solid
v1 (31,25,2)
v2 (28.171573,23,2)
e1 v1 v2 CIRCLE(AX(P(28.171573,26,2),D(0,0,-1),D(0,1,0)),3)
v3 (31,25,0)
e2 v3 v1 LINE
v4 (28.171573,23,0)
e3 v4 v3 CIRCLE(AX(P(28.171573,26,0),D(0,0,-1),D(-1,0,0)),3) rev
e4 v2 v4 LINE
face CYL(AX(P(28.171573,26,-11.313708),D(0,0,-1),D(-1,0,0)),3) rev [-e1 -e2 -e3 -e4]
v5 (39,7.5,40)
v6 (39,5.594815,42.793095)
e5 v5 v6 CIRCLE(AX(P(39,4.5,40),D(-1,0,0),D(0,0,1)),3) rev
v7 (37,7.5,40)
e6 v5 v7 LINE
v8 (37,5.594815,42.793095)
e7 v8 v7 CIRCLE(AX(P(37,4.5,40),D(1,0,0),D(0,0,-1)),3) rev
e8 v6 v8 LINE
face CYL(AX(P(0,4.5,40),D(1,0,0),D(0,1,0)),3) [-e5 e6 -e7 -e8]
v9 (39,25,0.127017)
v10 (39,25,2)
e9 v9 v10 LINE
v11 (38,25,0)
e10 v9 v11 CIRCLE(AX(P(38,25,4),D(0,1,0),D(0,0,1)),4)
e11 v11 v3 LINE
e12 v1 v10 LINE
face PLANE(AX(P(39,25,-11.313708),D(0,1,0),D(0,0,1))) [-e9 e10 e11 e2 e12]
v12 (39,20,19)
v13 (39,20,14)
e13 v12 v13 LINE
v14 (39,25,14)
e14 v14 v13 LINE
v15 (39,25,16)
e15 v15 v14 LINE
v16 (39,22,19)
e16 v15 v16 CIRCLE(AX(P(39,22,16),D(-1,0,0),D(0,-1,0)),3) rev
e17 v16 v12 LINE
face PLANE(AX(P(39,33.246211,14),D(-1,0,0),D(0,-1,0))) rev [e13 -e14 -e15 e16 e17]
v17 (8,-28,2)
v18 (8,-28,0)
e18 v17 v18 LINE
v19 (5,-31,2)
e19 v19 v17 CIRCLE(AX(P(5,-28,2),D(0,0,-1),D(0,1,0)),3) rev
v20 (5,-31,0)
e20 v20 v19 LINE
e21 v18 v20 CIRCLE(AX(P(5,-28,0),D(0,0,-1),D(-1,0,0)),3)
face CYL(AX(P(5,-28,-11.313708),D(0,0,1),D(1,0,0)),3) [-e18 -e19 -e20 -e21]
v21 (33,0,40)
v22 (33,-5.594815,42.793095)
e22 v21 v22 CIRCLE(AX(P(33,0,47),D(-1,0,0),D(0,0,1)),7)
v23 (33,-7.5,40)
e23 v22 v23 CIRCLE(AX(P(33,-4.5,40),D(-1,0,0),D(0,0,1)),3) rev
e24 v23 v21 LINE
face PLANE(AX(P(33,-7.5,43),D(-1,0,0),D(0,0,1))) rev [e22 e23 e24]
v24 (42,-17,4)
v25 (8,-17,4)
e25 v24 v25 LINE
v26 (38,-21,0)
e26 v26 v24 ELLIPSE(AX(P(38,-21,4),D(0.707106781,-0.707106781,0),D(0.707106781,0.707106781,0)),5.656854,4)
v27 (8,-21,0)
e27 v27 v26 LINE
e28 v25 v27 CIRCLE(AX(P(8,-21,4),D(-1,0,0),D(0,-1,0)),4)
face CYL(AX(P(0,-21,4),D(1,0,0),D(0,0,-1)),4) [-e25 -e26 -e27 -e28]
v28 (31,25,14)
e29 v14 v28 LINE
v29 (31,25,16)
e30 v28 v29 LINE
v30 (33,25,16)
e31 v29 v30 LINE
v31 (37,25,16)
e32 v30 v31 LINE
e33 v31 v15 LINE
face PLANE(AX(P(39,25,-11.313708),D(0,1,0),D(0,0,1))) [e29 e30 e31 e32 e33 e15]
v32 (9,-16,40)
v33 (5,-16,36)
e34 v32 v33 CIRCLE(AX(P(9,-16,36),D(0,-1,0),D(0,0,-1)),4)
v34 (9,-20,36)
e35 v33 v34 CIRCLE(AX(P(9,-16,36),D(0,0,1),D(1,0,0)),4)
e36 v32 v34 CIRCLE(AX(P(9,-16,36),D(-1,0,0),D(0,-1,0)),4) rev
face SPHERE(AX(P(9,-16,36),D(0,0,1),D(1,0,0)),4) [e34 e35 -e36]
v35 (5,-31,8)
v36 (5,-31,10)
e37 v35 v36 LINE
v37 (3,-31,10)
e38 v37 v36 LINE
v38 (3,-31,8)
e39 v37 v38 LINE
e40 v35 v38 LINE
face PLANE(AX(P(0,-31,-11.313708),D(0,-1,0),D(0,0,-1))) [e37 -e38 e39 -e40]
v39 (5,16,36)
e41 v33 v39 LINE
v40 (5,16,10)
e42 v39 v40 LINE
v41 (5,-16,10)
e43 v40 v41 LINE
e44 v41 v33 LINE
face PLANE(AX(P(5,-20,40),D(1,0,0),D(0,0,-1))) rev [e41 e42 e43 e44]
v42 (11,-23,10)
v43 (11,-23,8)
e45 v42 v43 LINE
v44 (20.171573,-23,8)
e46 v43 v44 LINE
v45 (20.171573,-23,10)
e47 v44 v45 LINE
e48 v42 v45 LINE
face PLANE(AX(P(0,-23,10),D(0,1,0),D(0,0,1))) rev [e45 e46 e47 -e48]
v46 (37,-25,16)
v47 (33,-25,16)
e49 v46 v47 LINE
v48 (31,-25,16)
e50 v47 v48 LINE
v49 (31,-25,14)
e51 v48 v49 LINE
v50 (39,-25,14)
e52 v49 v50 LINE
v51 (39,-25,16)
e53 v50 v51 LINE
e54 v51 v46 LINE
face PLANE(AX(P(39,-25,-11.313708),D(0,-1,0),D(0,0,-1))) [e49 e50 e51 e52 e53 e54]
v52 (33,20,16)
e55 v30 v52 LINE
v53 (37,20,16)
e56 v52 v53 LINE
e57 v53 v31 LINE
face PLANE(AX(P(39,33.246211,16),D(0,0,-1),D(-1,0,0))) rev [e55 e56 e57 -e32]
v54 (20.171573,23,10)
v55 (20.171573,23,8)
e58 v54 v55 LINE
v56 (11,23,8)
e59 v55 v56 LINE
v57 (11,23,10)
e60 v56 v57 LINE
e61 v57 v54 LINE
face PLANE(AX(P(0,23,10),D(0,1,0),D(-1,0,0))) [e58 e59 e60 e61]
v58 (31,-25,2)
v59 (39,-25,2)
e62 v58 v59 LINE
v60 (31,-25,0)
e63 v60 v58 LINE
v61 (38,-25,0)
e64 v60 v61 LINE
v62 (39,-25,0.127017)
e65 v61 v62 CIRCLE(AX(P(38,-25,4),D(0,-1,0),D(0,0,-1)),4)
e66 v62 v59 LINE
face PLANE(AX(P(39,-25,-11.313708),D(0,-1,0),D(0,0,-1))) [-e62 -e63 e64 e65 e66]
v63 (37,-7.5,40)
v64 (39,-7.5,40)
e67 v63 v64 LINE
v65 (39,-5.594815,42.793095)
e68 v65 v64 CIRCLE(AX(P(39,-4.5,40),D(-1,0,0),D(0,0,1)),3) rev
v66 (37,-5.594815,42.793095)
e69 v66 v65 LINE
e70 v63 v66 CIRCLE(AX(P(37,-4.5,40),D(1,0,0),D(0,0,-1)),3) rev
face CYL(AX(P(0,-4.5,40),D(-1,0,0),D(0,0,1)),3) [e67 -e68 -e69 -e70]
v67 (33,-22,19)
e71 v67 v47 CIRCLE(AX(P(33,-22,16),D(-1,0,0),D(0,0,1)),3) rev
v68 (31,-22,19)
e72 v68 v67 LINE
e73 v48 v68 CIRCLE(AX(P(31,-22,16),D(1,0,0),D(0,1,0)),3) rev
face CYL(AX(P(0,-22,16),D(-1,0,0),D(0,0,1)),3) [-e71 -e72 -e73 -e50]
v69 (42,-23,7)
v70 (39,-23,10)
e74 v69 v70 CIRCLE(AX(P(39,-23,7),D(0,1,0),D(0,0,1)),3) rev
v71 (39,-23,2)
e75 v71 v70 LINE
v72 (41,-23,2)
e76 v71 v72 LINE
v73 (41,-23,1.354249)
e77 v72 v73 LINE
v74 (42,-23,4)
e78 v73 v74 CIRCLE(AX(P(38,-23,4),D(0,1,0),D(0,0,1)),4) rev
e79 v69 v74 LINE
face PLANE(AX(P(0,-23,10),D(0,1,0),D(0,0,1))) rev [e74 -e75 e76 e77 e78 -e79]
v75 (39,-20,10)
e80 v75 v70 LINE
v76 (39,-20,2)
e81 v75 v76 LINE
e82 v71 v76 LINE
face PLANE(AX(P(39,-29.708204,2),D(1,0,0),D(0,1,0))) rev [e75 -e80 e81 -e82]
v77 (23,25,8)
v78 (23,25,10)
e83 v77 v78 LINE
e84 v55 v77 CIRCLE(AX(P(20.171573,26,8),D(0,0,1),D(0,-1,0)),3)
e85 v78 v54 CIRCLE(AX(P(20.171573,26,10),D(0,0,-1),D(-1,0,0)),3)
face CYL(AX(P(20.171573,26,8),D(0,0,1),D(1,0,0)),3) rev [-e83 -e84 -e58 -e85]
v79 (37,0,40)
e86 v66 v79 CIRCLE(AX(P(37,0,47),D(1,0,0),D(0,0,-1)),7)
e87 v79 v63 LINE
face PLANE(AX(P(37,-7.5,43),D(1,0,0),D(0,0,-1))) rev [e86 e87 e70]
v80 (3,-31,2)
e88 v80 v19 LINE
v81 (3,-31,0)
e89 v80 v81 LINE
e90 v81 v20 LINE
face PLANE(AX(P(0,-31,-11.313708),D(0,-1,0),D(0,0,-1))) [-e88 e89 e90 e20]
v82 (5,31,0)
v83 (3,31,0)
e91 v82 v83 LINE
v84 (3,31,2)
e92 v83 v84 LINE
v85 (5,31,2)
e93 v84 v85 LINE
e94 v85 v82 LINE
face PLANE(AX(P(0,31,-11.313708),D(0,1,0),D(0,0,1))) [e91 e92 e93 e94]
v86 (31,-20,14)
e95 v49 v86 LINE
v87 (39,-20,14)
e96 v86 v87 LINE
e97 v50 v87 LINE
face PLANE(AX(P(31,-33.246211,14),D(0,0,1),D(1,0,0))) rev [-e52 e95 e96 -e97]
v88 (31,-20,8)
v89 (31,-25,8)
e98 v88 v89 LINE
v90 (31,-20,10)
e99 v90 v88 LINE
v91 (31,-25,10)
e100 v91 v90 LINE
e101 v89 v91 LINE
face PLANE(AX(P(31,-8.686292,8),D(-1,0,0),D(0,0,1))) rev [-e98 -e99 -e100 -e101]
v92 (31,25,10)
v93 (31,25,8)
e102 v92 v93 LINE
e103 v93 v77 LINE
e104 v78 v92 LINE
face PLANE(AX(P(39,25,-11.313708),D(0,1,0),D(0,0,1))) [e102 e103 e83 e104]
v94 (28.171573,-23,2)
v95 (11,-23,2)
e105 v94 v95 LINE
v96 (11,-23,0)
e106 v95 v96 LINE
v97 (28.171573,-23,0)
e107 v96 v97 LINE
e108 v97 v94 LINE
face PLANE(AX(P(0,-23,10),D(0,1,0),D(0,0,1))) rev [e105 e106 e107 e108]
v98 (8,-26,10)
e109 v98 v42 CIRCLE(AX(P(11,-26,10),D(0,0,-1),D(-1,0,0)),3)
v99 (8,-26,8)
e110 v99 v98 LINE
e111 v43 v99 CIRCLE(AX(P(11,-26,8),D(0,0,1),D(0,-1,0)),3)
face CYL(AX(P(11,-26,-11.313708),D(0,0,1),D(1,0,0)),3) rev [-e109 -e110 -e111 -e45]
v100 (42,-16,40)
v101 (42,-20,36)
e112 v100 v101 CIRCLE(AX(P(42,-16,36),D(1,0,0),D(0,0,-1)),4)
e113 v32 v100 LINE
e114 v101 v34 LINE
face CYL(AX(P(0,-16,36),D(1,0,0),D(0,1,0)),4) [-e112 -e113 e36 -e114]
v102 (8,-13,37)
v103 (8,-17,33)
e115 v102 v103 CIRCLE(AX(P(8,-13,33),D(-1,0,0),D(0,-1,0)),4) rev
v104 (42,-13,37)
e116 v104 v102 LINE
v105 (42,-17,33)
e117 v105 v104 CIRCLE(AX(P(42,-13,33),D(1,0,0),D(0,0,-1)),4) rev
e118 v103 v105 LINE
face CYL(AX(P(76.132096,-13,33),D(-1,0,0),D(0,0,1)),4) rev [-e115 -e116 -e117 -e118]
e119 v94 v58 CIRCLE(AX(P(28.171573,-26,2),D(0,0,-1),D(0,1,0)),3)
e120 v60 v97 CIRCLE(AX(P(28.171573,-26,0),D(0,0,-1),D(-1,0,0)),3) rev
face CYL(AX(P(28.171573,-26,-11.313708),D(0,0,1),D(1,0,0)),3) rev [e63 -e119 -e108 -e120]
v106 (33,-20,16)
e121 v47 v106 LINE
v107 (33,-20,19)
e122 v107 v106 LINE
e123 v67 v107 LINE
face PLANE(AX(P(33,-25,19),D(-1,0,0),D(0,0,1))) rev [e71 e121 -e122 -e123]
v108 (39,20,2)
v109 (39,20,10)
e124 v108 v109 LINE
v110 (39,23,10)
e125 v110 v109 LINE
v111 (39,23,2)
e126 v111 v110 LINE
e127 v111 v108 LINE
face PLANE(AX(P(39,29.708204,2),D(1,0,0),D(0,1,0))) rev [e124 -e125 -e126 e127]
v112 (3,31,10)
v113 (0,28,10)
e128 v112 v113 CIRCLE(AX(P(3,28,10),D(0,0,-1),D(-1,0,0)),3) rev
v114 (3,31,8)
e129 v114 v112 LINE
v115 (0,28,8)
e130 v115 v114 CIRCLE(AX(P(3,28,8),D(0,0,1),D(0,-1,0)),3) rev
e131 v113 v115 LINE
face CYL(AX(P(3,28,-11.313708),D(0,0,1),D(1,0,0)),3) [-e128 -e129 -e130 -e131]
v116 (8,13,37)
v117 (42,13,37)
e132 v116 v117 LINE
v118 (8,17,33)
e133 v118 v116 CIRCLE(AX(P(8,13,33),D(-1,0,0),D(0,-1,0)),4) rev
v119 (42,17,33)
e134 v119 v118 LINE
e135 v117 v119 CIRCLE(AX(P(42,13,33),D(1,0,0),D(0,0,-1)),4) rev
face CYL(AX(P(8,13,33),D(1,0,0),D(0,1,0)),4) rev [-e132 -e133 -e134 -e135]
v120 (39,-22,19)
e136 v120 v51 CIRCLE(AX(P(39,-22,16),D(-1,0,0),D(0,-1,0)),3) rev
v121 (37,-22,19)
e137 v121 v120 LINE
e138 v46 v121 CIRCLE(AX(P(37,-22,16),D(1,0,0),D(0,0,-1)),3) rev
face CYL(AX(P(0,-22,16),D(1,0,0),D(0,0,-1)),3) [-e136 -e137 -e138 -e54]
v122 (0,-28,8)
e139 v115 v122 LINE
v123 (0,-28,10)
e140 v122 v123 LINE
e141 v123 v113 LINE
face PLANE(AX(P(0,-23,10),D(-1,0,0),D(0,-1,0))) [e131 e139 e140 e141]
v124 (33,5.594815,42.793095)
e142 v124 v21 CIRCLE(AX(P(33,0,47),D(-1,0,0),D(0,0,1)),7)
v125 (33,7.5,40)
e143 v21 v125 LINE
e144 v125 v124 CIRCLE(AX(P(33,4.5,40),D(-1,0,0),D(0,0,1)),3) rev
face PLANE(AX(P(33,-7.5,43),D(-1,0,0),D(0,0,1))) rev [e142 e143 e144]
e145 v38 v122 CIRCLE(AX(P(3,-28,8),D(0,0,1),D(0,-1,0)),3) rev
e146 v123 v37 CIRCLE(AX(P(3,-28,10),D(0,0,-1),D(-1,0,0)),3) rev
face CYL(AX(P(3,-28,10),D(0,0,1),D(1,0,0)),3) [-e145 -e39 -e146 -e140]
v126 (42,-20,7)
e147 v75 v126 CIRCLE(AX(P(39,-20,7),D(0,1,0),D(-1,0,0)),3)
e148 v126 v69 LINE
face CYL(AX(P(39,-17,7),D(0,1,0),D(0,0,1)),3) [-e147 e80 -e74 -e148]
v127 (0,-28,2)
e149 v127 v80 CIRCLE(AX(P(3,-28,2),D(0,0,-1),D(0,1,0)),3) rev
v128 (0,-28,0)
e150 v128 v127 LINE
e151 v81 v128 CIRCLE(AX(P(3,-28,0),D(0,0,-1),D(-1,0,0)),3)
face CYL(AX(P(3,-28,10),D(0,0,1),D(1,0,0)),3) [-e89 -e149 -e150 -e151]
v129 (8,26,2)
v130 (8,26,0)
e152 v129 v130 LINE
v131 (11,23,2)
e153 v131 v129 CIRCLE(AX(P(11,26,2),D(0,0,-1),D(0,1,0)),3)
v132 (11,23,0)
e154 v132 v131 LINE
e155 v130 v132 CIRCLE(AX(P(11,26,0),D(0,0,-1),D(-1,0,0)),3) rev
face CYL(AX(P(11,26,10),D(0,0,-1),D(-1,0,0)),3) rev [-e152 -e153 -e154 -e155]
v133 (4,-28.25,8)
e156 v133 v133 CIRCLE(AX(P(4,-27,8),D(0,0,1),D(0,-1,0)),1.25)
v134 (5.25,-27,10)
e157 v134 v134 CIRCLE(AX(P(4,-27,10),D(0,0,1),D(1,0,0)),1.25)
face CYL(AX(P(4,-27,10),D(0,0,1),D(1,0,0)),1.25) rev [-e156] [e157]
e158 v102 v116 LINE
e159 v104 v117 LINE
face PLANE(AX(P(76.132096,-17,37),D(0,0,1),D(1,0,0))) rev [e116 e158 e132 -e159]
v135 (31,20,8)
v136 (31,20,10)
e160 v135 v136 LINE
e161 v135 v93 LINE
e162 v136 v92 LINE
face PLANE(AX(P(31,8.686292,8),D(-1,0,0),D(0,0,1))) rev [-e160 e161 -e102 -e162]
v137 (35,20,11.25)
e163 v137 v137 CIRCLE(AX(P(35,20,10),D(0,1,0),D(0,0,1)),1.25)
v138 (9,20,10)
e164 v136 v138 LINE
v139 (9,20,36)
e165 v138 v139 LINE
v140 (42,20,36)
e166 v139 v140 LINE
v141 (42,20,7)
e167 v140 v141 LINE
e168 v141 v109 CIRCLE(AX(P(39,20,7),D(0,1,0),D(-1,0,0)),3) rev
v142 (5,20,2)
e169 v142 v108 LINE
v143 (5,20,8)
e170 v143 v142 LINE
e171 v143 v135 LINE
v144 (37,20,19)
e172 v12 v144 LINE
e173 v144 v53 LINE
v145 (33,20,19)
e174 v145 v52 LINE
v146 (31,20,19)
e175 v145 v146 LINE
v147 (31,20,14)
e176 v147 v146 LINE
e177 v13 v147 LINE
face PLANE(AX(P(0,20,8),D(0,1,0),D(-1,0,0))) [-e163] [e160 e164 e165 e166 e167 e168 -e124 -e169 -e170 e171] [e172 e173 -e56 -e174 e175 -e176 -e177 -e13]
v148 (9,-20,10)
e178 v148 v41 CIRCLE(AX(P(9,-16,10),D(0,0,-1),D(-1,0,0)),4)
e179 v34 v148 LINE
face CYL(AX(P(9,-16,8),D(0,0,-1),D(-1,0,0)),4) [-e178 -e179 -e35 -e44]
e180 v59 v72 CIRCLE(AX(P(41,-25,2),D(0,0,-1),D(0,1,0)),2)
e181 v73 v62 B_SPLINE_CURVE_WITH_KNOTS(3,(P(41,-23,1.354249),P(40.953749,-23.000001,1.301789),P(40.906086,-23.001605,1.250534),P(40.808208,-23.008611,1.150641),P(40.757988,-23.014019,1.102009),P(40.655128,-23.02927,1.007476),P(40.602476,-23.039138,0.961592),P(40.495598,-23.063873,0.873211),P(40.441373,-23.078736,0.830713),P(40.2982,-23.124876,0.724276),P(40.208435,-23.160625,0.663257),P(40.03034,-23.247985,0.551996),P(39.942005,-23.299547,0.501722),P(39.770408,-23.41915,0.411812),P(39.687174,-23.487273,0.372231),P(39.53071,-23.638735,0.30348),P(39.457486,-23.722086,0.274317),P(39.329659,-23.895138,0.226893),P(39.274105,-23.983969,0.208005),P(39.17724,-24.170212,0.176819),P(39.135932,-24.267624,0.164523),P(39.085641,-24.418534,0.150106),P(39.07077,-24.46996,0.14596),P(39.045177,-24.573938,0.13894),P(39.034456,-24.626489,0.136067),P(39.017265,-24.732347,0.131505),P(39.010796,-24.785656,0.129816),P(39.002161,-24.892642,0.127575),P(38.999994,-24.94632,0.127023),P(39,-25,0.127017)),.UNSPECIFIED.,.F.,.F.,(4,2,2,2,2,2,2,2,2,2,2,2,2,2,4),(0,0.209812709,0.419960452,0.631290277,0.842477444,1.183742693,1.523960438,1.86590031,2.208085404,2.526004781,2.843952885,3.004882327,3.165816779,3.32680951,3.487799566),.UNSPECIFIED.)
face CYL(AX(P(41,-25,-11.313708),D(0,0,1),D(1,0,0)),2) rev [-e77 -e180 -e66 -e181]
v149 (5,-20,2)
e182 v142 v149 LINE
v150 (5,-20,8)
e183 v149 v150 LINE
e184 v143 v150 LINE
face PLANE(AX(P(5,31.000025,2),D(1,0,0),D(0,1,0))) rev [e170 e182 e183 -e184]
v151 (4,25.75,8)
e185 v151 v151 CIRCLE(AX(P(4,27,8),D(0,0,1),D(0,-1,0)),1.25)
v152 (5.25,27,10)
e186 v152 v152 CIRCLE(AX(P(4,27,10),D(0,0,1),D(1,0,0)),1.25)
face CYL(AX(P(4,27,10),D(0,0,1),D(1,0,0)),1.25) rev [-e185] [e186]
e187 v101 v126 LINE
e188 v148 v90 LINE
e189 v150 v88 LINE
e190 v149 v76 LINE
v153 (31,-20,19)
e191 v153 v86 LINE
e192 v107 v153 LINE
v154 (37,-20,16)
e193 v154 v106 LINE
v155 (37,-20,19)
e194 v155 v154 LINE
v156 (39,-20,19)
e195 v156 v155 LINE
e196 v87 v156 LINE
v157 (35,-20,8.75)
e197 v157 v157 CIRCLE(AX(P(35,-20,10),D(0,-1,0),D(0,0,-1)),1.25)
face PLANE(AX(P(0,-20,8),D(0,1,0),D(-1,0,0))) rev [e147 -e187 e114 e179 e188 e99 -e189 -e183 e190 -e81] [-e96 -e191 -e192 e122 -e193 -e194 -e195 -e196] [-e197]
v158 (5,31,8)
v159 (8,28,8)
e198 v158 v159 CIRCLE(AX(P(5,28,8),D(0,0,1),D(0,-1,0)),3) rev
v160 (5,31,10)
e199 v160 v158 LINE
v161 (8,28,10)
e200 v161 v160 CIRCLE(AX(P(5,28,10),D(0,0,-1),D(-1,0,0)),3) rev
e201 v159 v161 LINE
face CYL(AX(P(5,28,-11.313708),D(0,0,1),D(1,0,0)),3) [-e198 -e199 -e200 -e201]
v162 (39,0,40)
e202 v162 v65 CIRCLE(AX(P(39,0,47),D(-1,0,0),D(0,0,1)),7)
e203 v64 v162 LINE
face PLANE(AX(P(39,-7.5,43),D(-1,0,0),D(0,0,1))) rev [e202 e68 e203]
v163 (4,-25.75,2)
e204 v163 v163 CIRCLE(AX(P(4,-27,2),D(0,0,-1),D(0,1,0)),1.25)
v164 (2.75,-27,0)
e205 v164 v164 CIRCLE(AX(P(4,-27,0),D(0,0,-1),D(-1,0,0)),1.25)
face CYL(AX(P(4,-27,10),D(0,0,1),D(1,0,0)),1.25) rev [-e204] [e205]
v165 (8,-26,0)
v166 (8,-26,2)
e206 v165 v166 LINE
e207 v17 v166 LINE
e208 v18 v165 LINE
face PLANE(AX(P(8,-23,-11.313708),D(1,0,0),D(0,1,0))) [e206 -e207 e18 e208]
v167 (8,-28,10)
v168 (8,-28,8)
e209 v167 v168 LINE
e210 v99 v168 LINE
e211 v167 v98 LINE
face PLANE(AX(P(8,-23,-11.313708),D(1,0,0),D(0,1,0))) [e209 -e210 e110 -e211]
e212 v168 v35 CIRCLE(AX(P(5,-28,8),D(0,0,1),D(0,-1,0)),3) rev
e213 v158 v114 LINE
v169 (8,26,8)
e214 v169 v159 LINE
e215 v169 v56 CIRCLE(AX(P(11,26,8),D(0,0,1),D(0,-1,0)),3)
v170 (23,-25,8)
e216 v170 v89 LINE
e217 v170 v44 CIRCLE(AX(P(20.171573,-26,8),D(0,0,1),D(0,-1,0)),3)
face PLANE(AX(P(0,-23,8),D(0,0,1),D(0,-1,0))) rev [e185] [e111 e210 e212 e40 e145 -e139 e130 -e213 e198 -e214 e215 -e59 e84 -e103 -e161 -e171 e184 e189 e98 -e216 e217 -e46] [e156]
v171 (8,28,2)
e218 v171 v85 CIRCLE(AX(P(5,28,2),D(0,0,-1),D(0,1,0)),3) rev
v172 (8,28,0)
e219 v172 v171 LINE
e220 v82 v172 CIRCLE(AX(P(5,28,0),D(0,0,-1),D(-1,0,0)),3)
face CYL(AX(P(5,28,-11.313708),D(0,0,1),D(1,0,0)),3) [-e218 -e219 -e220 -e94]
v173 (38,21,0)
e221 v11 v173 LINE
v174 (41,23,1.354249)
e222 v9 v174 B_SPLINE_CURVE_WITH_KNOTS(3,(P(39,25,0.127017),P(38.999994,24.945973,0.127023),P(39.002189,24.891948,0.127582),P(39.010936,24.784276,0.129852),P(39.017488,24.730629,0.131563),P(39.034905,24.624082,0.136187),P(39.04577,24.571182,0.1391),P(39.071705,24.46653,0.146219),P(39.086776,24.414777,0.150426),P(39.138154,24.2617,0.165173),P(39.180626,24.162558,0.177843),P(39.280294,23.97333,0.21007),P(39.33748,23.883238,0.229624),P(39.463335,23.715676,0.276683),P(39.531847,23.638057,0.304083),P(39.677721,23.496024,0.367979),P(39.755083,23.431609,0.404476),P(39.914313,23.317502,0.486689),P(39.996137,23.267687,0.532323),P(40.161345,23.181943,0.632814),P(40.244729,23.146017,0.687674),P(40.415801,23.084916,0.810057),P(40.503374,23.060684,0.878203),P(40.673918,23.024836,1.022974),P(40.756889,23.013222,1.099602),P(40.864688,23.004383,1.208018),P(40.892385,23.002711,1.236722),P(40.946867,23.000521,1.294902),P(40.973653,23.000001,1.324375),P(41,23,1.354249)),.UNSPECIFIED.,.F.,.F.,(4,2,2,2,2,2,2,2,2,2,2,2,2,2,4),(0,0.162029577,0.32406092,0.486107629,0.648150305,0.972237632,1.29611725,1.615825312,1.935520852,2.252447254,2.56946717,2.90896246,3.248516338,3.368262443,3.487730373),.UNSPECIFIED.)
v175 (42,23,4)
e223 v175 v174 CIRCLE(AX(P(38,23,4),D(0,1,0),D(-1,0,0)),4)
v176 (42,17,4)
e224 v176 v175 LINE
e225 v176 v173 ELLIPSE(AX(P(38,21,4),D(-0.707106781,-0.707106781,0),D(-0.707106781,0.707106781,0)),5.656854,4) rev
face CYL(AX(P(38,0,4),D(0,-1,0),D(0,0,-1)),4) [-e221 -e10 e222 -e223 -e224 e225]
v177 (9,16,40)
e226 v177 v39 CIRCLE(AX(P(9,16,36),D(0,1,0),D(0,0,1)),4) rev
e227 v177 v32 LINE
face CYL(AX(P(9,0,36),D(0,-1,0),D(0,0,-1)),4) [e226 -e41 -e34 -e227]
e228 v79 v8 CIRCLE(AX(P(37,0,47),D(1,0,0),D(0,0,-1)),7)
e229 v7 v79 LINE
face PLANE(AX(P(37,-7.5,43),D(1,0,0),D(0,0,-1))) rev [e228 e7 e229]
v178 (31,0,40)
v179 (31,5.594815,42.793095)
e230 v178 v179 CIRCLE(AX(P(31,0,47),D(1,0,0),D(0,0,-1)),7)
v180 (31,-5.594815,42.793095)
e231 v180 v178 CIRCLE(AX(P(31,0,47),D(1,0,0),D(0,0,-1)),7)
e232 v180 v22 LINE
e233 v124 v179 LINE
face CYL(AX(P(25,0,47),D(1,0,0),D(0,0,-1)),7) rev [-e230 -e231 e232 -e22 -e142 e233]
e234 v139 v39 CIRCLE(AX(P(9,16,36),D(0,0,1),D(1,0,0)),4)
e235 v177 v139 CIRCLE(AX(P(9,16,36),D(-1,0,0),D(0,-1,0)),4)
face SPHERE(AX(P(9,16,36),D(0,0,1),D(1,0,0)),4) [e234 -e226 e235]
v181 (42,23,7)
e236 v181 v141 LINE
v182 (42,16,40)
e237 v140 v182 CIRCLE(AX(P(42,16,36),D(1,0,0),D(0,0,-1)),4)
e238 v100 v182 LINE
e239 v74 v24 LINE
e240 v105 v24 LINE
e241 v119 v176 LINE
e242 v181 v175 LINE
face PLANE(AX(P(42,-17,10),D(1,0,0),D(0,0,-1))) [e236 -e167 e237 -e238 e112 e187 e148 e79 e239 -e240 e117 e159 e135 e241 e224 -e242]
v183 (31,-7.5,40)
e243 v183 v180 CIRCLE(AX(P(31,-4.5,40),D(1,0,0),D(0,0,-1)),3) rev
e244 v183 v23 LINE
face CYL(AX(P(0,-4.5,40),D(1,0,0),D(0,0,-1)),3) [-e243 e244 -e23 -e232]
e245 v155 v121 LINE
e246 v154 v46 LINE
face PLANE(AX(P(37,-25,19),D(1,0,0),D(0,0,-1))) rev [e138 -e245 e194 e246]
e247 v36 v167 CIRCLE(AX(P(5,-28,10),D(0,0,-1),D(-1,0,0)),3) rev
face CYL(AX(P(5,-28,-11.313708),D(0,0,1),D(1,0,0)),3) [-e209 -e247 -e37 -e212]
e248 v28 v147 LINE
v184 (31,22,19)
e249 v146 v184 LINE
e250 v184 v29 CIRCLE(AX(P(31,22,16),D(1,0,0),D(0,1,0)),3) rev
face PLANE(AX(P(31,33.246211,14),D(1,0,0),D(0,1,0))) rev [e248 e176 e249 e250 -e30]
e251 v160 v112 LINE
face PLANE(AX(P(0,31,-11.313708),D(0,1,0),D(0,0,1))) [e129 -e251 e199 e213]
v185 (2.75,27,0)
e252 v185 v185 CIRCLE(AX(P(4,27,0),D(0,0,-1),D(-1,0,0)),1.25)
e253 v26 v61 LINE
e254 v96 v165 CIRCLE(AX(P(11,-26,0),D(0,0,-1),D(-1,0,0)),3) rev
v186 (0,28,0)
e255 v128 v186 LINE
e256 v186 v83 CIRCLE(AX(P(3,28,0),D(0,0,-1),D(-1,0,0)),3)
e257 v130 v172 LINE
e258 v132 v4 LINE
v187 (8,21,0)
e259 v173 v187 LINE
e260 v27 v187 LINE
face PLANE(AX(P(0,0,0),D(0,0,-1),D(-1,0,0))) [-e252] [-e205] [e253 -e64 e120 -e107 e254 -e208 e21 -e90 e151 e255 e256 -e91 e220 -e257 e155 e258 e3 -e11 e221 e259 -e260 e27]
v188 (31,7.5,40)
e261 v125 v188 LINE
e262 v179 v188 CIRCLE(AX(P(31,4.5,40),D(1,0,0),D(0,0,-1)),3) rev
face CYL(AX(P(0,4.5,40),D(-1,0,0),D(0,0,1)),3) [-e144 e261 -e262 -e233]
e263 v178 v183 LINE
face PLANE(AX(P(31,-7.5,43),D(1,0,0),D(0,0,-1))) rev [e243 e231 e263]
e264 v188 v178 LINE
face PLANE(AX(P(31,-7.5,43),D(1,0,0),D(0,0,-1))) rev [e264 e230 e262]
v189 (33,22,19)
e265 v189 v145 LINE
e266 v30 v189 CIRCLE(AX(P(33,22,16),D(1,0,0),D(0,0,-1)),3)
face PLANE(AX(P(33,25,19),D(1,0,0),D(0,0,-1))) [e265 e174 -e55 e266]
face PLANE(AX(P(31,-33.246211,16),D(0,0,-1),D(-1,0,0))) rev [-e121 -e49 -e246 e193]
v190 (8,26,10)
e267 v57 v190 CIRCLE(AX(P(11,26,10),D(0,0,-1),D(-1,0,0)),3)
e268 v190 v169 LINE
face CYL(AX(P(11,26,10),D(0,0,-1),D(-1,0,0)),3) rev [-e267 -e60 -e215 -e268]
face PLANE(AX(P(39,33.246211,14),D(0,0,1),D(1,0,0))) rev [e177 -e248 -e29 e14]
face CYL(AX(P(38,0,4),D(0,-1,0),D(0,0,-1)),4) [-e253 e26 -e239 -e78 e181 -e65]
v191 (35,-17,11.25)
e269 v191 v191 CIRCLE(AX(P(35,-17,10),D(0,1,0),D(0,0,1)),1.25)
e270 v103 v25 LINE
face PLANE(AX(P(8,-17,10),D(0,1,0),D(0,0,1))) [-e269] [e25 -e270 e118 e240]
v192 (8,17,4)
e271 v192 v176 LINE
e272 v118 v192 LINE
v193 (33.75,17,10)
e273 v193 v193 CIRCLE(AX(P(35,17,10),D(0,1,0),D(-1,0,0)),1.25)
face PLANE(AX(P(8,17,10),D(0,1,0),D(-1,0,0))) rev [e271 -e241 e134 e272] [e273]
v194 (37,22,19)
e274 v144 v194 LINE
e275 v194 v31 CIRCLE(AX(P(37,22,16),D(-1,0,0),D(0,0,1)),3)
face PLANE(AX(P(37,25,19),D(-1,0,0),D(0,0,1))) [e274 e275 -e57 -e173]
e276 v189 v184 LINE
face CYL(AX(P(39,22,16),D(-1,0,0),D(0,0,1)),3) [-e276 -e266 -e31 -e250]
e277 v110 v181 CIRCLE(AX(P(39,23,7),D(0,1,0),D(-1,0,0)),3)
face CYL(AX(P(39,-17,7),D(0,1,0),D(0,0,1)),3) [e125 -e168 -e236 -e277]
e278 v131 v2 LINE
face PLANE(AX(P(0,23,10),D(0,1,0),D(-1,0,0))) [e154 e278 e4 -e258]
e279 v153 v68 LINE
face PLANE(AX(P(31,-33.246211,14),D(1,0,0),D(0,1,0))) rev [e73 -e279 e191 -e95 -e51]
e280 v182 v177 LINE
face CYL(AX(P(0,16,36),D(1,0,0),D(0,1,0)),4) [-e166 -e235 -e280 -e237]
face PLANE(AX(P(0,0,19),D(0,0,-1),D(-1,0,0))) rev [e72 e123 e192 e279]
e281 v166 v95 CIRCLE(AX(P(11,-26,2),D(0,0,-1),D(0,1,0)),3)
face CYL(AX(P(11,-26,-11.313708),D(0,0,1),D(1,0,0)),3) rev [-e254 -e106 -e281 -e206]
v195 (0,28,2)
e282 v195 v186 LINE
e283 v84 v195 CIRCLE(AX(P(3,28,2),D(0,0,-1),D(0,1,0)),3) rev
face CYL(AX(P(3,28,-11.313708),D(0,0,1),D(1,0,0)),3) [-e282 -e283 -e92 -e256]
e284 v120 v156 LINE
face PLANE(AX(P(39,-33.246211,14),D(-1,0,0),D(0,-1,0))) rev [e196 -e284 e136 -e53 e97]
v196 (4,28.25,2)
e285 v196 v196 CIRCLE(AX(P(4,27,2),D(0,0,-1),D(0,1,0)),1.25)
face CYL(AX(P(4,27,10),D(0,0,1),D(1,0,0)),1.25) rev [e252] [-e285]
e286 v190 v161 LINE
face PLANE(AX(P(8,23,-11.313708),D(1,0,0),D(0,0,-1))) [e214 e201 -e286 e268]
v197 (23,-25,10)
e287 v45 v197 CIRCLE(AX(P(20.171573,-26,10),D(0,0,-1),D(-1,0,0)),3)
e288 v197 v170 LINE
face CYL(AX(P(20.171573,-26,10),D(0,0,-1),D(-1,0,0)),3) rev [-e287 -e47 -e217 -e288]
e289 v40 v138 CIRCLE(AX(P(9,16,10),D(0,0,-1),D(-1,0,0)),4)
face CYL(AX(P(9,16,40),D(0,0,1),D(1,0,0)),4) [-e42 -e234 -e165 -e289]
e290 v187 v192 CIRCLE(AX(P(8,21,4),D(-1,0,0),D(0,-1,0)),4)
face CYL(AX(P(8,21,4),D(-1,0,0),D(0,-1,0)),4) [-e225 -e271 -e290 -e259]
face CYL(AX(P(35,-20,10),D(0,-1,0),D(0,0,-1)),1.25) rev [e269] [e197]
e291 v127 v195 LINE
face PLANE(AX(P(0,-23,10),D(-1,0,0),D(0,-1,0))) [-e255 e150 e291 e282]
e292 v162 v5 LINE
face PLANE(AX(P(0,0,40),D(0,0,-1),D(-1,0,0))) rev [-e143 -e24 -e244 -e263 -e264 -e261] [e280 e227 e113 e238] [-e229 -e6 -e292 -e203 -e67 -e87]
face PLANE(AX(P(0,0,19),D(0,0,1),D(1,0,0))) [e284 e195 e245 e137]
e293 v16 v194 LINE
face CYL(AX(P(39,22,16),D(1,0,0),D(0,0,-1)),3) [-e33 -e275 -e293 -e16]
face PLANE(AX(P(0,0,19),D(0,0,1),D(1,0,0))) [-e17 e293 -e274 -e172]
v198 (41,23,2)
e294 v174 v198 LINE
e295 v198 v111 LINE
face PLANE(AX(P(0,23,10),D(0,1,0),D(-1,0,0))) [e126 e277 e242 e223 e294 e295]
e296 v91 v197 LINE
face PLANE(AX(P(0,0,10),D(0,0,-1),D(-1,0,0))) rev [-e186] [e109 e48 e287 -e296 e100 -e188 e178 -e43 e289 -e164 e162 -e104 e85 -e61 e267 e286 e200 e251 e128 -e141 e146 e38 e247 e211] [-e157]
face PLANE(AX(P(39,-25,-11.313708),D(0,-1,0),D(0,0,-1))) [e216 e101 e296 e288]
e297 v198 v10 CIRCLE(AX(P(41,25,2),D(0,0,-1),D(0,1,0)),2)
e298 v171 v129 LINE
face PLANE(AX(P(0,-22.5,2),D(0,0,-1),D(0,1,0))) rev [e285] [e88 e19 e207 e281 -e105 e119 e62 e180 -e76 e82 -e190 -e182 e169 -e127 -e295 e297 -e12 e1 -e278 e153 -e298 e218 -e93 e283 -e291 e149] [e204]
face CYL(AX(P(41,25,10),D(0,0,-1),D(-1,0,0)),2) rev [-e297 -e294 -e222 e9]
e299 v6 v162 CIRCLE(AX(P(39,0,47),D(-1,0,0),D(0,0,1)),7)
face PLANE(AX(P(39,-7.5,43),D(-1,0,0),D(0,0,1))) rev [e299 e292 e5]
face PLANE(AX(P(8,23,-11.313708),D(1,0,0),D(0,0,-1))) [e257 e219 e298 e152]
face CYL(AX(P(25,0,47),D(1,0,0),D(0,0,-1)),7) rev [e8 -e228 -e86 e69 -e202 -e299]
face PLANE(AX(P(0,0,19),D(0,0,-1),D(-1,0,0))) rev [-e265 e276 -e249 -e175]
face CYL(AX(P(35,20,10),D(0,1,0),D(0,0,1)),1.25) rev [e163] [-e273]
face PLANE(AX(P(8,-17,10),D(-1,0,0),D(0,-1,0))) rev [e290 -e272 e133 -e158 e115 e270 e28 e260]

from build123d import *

# Parameters (mm, degrees)
ESTRUSIONE_ESTRUSIONE1_DEPTH  = 10
SCHIZZO6_W                    = 8
SCHIZZO6_H                    = 8
SCHIZZO6_H_2                  = 2
ESTRUSIONE_ESTRUSIONE4_DEPTH  = 10
TAGLIO_ESTRUSIONE1_DEPTH      = 54.150729064
SCHIZZO4_W                    = 3
SCHIZZO4_H                    = 6
ESTRUSIONE_ESTRUSIONE2_DEPTH  = 3
SCHIZZO5_W                    = 3
SCHIZZO5_H                    = 6
ESTRUSIONE_ESTRUSIONE3_DEPTH  = 3
SCHIZZO3_W                    = 5
SCHIZZO3_H                    = 6
TAGLIO_ESTRUSIONE2_DEPTH      = 67.820655489
FORO_FILETTATO_M3X0_5_1_D     = 2.5
ESTRUSIONE_ESTRUSIONE5_DEPTH  = 30
SCHIZZO10_W                   = 3
SCHIZZO10_H                   = 34
ESTRUSIONE_ESTRUSIONE6_DEPTH  = 34
SCHIZZO18_W                   = 8
SCHIZZO18_H                   = 8
TAGLIO_ESTRUSIONE3_DEPTH      = 5
SCHIZZO24_W                   = 8
SCHIZZO24_H                   = 2
ESTRUSIONE_ESTRUSIONE9_DEPTH  = 5
SCHIZZO23_W                   = 8
SCHIZZO23_H                   = 8
TAGLIO_ESTRUSIONE4_DEPTH      = 5
SCHIZZO25_W                   = 8
SCHIZZO25_H                   = 2
ESTRUSIONE_ESTRUSIONE10_DEPTH = 5
FORO_FILETTATO_M3X0_5_4_D     = 2.5
FORO_FILETTATO_M3X0_5_4_DEPTH = 7.5
FORO_FILETTATO_M3X0_5_4_TIP   = 0.751075774
FORO_FILETTATO_M3X0_5_5_D     = 2.5
FORO_FILETTATO_M3X0_5_5_DEPTH = 7.5
FORO_FILETTATO_M3X0_5_5_TIP   = 0.751075774
SCHIZZO11_W                   = 2
SCHIZZO11_H                   = 15
ESTRUSIONE_ESTRUSIONE7_DEPTH  = 3
SCHIZZO12_W                   = 2
SCHIZZO12_H                   = 5
ESTRUSIONE_ESTRUSIONE8_DEPTH  = 3
SCHIZZO28_W                   = 8
SCHIZZO28_H                   = 2
ESTRUSIONE_ESTRUSIONE11_DEPTH = 2
SCHIZZO29_W                   = 8
SCHIZZO29_H                   = 2
ESTRUSIONE_ESTRUSIONE12_DEPTH = 2
RACCORDO1_R                   = 4
RACCORDO2_DEPTH               = 2
RACCORDO2_START               = 8
RACCORDO2_2_DEPTH             = 2
RACCORDO2_START_2             = -1
RACCORDO2_3_DEPTH             = 12
RACCORDO2_START_3             = -23
RACCORDO2_4_DEPTH             = 3
RACCORDO2_START_4             = 20
RACCORDO2_5_DEPTH             = 3
RACCORDO2_START_5             = 31
RACCORDO2_6_DEPTH             = 8
RACCORDO30_R                  = 2
SCHIZZO30_R                   = 7
TAGLIO_ESTRUSIONE5_DEPTH      = 17


with BuildPart() as part:
    # Schizzo1 → Estrusione-Estrusione1 (new body)
    with BuildSketch(Plane.XY):
        Polygon((0, -23), (42, -23), (42, -17), (8, -17), (8, 17), (42, 17), (42, 23), (0, 23), align=None)
    extrude(amount=ESTRUSIONE_ESTRUSIONE1_DEPTH)

    # Schizzo6 → Estrusione-Estrusione4 (add)
    with BuildSketch(Plane.XY.offset(10)):
        with Locations((4, -27)):
            Rectangle(SCHIZZO6_W, SCHIZZO6_H)
        with Locations((4, 27)):
            Rectangle(SCHIZZO6_W, SCHIZZO6_H)
        with Locations((35, -24)):
            Rectangle(SCHIZZO6_W, SCHIZZO6_H_2)
        with Locations((35, 24)):
            Rectangle(SCHIZZO6_W, SCHIZZO6_H_2)
    extrude(amount=-ESTRUSIONE_ESTRUSIONE4_DEPTH)

    # Schizzo2 → Taglio-Estrusione1 (cut, through all)
    with BuildSketch(Plane(origin=(42, 0, 0), x_dir=(0, 0, -1), z_dir=(1, 0, 0))):
        Polygon((-8, -23), (-8, -41.817102562), (-2, -41.817102562), (-2, -22.5), (-2, -20), (-8, -20), align=None)
    taglio_estrusione1 = extrude(amount=-TAGLIO_ESTRUSIONE1_DEPTH, mode=Mode.SUBTRACT)

    # Schizzo4 → Estrusione-Estrusione2 (add)
    with BuildSketch(Plane(origin=(0, -20, 0), x_dir=(-1, 0, 0), z_dir=(0, -1, 0))):
        with Locations((-40.5, -5)):
            Rectangle(SCHIZZO4_W, SCHIZZO4_H)
    extrude(amount=ESTRUSIONE_ESTRUSIONE2_DEPTH)

    # Specchia1: Taglio-Estrusione1 across plane
    add(taglio_estrusione1.mirror(Plane.ZX), mode=Mode.SUBTRACT)

    # Schizzo5 → Estrusione-Estrusione3 (add)
    with BuildSketch(Plane(origin=(0, 20, 0), x_dir=(1, 0, 0), z_dir=(0, 1, 0))):
        with Locations((40.5, -5)):
            Rectangle(SCHIZZO5_W, SCHIZZO5_H)
    extrude(amount=ESTRUSIONE_ESTRUSIONE3_DEPTH)

    # Schizzo3 → Taglio-Estrusione2 (cut, through all)
    with BuildSketch(Plane.XZ.offset(20)):
        with Locations((2.5, 5)):
            Rectangle(SCHIZZO3_W, SCHIZZO3_H)
    extrude(amount=-TAGLIO_ESTRUSIONE2_DEPTH, mode=Mode.SUBTRACT)

    # Foro filettato M3x0.5-1 (through all)
    with Locations(Plane.XY.offset(10)):
        with Locations((4, -27), (4, 27)):
            Hole(FORO_FILETTATO_M3X0_5_1_D / 2)

    # Schizzo9 → Estrusione-Estrusione5 (add)
    with BuildSketch(Plane.XY.offset(10)):
        Polygon((5, -20), (42, -20), (42, -17), (8, -17), (8, 17), (42, 17), (42, 20), (5, 20), align=None)
    extrude(amount=ESTRUSIONE_ESTRUSIONE5_DEPTH)

    # Schizzo10 → Estrusione-Estrusione6 (add)
    with BuildSketch(Plane(origin=(8, 0, 0), x_dir=(0, 0, -1), z_dir=(1, 0, 0))):
        with Locations((-38.5, 0)):
            Rectangle(SCHIZZO10_W, SCHIZZO10_H)
    extrude(amount=ESTRUSIONE_ESTRUSIONE6_DEPTH)

    # Schizzo18 → Taglio-Estrusione3 (cut)
    with BuildSketch(Plane.XZ.offset(25)):
        with Locations((35, 12)):
            Rectangle(SCHIZZO18_W, SCHIZZO18_H)
    extrude(amount=-TAGLIO_ESTRUSIONE3_DEPTH, mode=Mode.SUBTRACT)

    # Schizzo24 → Estrusione-Estrusione9 (add)
    with BuildSketch(Plane.XZ.offset(20)):
        with Locations((35, 15)):
            Rectangle(SCHIZZO24_W, SCHIZZO24_H)
    extrude(amount=ESTRUSIONE_ESTRUSIONE9_DEPTH)

    # Schizzo23 → Taglio-Estrusione4 (cut)
    with BuildSketch(Plane(origin=(0, 25, 0), x_dir=(1, 0, 0), z_dir=(0, 1, 0))):
        with Locations((35, -12)):
            Rectangle(SCHIZZO23_W, SCHIZZO23_H)
    extrude(amount=-TAGLIO_ESTRUSIONE4_DEPTH, mode=Mode.SUBTRACT)

    # Schizzo25 → Estrusione-Estrusione10 (add)
    with BuildSketch(Plane(origin=(0, 20, 0), x_dir=(1, 0, 0), z_dir=(0, 1, 0))):
        with Locations((35, -15)):
            Rectangle(SCHIZZO25_W, SCHIZZO25_H)
    extrude(amount=ESTRUSIONE_ESTRUSIONE10_DEPTH)

    # Foro filettato M3x0.5-4
    with Locations(Plane(origin=(0, -20, 0), x_dir=(-1, 0, 0), z_dir=(0, -1, 0))):
        with Locations((-35, -10)):
            Hole(FORO_FILETTATO_M3X0_5_4_D / 2, depth=FORO_FILETTATO_M3X0_5_4_DEPTH)
            with Locations((0, 0, -(FORO_FILETTATO_M3X0_5_4_DEPTH + FORO_FILETTATO_M3X0_5_4_TIP / 2))):  # 118° drill point
                Cone(0, FORO_FILETTATO_M3X0_5_4_D / 2, FORO_FILETTATO_M3X0_5_4_TIP, mode=Mode.SUBTRACT)

    # Foro filettato M3x0.5-5
    with Locations(Plane(origin=(0, 20, 0), x_dir=(1, 0, 0), z_dir=(0, 1, 0))):
        with Locations((35, -10)):
            Hole(FORO_FILETTATO_M3X0_5_5_D / 2, depth=FORO_FILETTATO_M3X0_5_5_DEPTH)
            with Locations((0, 0, -(FORO_FILETTATO_M3X0_5_5_DEPTH + FORO_FILETTATO_M3X0_5_5_TIP / 2))):  # 118° drill point
                Cone(0, FORO_FILETTATO_M3X0_5_5_D / 2, FORO_FILETTATO_M3X0_5_5_TIP, mode=Mode.SUBTRACT)

    # Schizzo11 → Estrusione-Estrusione7 (add)
    with BuildSketch(Plane.XY.offset(40)):
        with Locations((38, 0)):
            Rectangle(SCHIZZO11_W, SCHIZZO11_H)
        with Locations((32, 0)):
            Rectangle(SCHIZZO11_W, SCHIZZO11_H)
    extrude(amount=ESTRUSIONE_ESTRUSIONE7_DEPTH)

    # Schizzo12 → Estrusione-Estrusione8 (add)
    with BuildSketch(Plane.XY.offset(16)):
        with Locations((38, -22.5)):
            Rectangle(SCHIZZO12_W, SCHIZZO12_H)
        with Locations((32, -22.5)):
            Rectangle(SCHIZZO12_W, SCHIZZO12_H)
    estrusione_estrusione8 = extrude(amount=ESTRUSIONE_ESTRUSIONE8_DEPTH)

    # Schizzo28 → Estrusione-Estrusione11 (add)
    with BuildSketch(Plane.XZ.offset(23)):
        with Locations((27, 9)):
            Rectangle(SCHIZZO28_W, SCHIZZO28_H)
    extrude(amount=ESTRUSIONE_ESTRUSIONE11_DEPTH)

    # Schizzo29 → Estrusione-Estrusione12 (add)
    with BuildSketch(Plane(origin=(0, 23, 0), x_dir=(1, 0, 0), z_dir=(0, 1, 0))):
        with Locations((27, -9)):
            Rectangle(SCHIZZO29_W, SCHIZZO29_H)
    extrude(amount=ESTRUSIONE_ESTRUSIONE12_DEPTH)

    # Specchia2: Estrusione-Estrusione8 across plane
    add(estrusione_estrusione8.mirror(Plane.ZX))

    # Raccordo1
    raccordo1_edges = [part.edges().sort_by_distance(p)[0] for p in [
        (23.5, -20, 40),
        (23.5, 20, 40),
        (5, 0, 40),
        (5, 20, 25),
        (5, -20, 25),
        (42, 20, 0),
        (42, -20, 0),
        (25, -17, 37),
        (25, -17, 0),
        (25, 17, 37),
        (25, 17, 0),
    ]]
    fillet(raccordo1_edges, radius=RACCORDO1_R)

    # Raccordo2: read off the stored shape, not the designer's step
    # Raccordo2 outline → Raccordo2 (add)
    with BuildSketch(Plane.XY):
        with BuildLine():
            Line((8, -23), (8, -26))
            ThreePointArc((8, -26), (8.878679656, -23.878679656), (11, -23))
            Line((11, -23), (8, -23))
        make_face()
        with BuildLine():
            Line((8, 23), (11, 23))
            ThreePointArc((11, 23), (8.878679656, 23.878679656), (8, 26))
            Line((8, 26), (8, 23))
        make_face()
        with BuildLine():
            Line((31, 23), (31, 25))
            ThreePointArc((31, 25), (29.903623683, 23.550510257), (28.171572875, 23))
            Line((28.171572875, 23), (31, 23))
        make_face()
        with BuildLine():
            ThreePointArc((28.171572875, -23), (29.903623683, -23.550510257), (31, -25))
            Line((31, -25), (31, -23))
            Line((31, -23), (28.171572875, -23))
        make_face()
    extrude(amount=RACCORDO2_DEPTH)

    # Raccordo2 2 outline → Raccordo2 2 (add)
    with BuildSketch(Plane.XY.offset(RACCORDO2_START)):
        with BuildLine():
            ThreePointArc((23, 25), (21.903623683, 23.550510257), (20.171572875, 23))
            Line((20.171572875, 23), (23, 23))
            Line((23, 23), (23, 25))
        make_face()
        with BuildLine():
            Line((23, -23), (20.171572875, -23))
            ThreePointArc((20.171572875, -23), (21.903623683, -23.550510257), (23, -25))
            Line((23, -25), (23, -23))
        make_face()
        with BuildLine():
            Line((8, -23), (8, -26))
            ThreePointArc((8, -26), (8.878679656, -23.878679656), (11, -23))
            Line((11, -23), (8, -23))
        make_face()
        with BuildLine():
            Line((8, 23), (11, 23))
            ThreePointArc((11, 23), (8.878679656, 23.878679656), (8, 26))
            Line((8, 26), (8, 23))
        make_face()
    extrude(amount=RACCORDO2_2_DEPTH)

    # Raccordo2 3 outline → Raccordo2 3 (cut)
    with BuildSketch(Plane.XY.offset(RACCORDO2_START_2)):
        with BuildLine():
            ThreePointArc((8, -28), (7.121320344, -30.121320344), (5, -31))
            Line((5, -31), (8, -31))
            Line((8, -31), (8, -28))
        make_face()
        with BuildLine():
            ThreePointArc((3, -31), (0.878679656, -30.121320344), (0, -28))
            Line((0, -28), (0, -31))
            Line((0, -31), (3, -31))
        make_face()
        with BuildLine():
            ThreePointArc((0, 28), (0.878679656, 30.121320344), (3, 31))
            Line((3, 31), (0, 31))
            Line((0, 31), (0, 28))
        make_face()
        with BuildLine():
            ThreePointArc((5, 31), (7.121320344, 30.121320344), (8, 28))
            Line((8, 28), (8, 31))
            Line((8, 31), (5, 31))
        make_face()
    extrude(amount=RACCORDO2_3_DEPTH, mode=Mode.SUBTRACT)

    # Raccordo2 4 outline → Raccordo2 4 (cut)
    with BuildSketch(Plane(origin=(0, 0, 0), x_dir=(1, 0, 0), z_dir=(0, 1, 0)).offset(RACCORDO2_START_3)):
        with BuildLine():
            ThreePointArc((42, -7), (41.121320344, -9.121320344), (39, -10))
            Line((39, -10), (42, -10))
            Line((42, -10), (42, -7))
        make_face()
    extrude(amount=RACCORDO2_4_DEPTH, mode=Mode.SUBTRACT)

    # Raccordo2 5 outline → Raccordo2 5 (cut)
    with BuildSketch(Plane(origin=(0, 0, 0), x_dir=(1, 0, 0), z_dir=(0, 1, 0)).offset(RACCORDO2_START_4)):
        with BuildLine():
            ThreePointArc((42, -7), (41.121320344, -9.121320344), (39, -10))
            Line((39, -10), (42, -10))
            Line((42, -10), (42, -7))
        make_face()
    extrude(amount=RACCORDO2_5_DEPTH, mode=Mode.SUBTRACT)

    # Raccordo2 6 outline → Raccordo2 6 (cut)
    with BuildSketch(Plane.YZ.offset(RACCORDO2_START_5)):
        with BuildLine():
            ThreePointArc((22, 19), (24.121320344, 18.121320344), (25, 16))
            Line((25, 16), (25, 19))
            Line((25, 19), (22, 19))
        make_face()
        with BuildLine():
            ThreePointArc((-7.5, 40), (-6.621320344, 42.121320344), (-4.5, 43))
            Line((-4.5, 43), (-7.5, 43))
            Line((-7.5, 43), (-7.5, 40))
        make_face()
        with BuildLine():
            ThreePointArc((4.5, 43), (6.621320344, 42.121320344), (7.5, 40))
            Line((7.5, 40), (7.5, 43))
            Line((7.5, 43), (4.5, 43))
        make_face()
        with BuildLine():
            Line((-25, 19), (-25, 16))
            ThreePointArc((-25, 16), (-24.121320344, 18.121320344), (-22, 19))
            Line((-22, 19), (-25, 19))
        make_face()
    extrude(amount=RACCORDO2_6_DEPTH, mode=Mode.SUBTRACT)

    # Raccordo30
    raccordo30_edges = [part.edges().sort_by_distance(p)[0] for p in [
        (39, 23, 1.063508327),
        (39, -23, 1.063508327),
    ]]
    fillet(raccordo30_edges, radius=RACCORDO30_R - 0.0001)  # a hair under: the kernel refuses the full size

    # Schizzo30 → Taglio-Estrusione5 (cut)
    with BuildSketch(Plane(origin=(42, 0, 0), x_dir=(0, 0, -1), z_dir=(1, 0, 0))):
        with Locations((-47, 0)):
            Circle(SCHIZZO30_R)
    extrude(amount=-TAGLIO_ESTRUSIONE5_DEPTH, mode=Mode.SUBTRACT)


solid = part.part
